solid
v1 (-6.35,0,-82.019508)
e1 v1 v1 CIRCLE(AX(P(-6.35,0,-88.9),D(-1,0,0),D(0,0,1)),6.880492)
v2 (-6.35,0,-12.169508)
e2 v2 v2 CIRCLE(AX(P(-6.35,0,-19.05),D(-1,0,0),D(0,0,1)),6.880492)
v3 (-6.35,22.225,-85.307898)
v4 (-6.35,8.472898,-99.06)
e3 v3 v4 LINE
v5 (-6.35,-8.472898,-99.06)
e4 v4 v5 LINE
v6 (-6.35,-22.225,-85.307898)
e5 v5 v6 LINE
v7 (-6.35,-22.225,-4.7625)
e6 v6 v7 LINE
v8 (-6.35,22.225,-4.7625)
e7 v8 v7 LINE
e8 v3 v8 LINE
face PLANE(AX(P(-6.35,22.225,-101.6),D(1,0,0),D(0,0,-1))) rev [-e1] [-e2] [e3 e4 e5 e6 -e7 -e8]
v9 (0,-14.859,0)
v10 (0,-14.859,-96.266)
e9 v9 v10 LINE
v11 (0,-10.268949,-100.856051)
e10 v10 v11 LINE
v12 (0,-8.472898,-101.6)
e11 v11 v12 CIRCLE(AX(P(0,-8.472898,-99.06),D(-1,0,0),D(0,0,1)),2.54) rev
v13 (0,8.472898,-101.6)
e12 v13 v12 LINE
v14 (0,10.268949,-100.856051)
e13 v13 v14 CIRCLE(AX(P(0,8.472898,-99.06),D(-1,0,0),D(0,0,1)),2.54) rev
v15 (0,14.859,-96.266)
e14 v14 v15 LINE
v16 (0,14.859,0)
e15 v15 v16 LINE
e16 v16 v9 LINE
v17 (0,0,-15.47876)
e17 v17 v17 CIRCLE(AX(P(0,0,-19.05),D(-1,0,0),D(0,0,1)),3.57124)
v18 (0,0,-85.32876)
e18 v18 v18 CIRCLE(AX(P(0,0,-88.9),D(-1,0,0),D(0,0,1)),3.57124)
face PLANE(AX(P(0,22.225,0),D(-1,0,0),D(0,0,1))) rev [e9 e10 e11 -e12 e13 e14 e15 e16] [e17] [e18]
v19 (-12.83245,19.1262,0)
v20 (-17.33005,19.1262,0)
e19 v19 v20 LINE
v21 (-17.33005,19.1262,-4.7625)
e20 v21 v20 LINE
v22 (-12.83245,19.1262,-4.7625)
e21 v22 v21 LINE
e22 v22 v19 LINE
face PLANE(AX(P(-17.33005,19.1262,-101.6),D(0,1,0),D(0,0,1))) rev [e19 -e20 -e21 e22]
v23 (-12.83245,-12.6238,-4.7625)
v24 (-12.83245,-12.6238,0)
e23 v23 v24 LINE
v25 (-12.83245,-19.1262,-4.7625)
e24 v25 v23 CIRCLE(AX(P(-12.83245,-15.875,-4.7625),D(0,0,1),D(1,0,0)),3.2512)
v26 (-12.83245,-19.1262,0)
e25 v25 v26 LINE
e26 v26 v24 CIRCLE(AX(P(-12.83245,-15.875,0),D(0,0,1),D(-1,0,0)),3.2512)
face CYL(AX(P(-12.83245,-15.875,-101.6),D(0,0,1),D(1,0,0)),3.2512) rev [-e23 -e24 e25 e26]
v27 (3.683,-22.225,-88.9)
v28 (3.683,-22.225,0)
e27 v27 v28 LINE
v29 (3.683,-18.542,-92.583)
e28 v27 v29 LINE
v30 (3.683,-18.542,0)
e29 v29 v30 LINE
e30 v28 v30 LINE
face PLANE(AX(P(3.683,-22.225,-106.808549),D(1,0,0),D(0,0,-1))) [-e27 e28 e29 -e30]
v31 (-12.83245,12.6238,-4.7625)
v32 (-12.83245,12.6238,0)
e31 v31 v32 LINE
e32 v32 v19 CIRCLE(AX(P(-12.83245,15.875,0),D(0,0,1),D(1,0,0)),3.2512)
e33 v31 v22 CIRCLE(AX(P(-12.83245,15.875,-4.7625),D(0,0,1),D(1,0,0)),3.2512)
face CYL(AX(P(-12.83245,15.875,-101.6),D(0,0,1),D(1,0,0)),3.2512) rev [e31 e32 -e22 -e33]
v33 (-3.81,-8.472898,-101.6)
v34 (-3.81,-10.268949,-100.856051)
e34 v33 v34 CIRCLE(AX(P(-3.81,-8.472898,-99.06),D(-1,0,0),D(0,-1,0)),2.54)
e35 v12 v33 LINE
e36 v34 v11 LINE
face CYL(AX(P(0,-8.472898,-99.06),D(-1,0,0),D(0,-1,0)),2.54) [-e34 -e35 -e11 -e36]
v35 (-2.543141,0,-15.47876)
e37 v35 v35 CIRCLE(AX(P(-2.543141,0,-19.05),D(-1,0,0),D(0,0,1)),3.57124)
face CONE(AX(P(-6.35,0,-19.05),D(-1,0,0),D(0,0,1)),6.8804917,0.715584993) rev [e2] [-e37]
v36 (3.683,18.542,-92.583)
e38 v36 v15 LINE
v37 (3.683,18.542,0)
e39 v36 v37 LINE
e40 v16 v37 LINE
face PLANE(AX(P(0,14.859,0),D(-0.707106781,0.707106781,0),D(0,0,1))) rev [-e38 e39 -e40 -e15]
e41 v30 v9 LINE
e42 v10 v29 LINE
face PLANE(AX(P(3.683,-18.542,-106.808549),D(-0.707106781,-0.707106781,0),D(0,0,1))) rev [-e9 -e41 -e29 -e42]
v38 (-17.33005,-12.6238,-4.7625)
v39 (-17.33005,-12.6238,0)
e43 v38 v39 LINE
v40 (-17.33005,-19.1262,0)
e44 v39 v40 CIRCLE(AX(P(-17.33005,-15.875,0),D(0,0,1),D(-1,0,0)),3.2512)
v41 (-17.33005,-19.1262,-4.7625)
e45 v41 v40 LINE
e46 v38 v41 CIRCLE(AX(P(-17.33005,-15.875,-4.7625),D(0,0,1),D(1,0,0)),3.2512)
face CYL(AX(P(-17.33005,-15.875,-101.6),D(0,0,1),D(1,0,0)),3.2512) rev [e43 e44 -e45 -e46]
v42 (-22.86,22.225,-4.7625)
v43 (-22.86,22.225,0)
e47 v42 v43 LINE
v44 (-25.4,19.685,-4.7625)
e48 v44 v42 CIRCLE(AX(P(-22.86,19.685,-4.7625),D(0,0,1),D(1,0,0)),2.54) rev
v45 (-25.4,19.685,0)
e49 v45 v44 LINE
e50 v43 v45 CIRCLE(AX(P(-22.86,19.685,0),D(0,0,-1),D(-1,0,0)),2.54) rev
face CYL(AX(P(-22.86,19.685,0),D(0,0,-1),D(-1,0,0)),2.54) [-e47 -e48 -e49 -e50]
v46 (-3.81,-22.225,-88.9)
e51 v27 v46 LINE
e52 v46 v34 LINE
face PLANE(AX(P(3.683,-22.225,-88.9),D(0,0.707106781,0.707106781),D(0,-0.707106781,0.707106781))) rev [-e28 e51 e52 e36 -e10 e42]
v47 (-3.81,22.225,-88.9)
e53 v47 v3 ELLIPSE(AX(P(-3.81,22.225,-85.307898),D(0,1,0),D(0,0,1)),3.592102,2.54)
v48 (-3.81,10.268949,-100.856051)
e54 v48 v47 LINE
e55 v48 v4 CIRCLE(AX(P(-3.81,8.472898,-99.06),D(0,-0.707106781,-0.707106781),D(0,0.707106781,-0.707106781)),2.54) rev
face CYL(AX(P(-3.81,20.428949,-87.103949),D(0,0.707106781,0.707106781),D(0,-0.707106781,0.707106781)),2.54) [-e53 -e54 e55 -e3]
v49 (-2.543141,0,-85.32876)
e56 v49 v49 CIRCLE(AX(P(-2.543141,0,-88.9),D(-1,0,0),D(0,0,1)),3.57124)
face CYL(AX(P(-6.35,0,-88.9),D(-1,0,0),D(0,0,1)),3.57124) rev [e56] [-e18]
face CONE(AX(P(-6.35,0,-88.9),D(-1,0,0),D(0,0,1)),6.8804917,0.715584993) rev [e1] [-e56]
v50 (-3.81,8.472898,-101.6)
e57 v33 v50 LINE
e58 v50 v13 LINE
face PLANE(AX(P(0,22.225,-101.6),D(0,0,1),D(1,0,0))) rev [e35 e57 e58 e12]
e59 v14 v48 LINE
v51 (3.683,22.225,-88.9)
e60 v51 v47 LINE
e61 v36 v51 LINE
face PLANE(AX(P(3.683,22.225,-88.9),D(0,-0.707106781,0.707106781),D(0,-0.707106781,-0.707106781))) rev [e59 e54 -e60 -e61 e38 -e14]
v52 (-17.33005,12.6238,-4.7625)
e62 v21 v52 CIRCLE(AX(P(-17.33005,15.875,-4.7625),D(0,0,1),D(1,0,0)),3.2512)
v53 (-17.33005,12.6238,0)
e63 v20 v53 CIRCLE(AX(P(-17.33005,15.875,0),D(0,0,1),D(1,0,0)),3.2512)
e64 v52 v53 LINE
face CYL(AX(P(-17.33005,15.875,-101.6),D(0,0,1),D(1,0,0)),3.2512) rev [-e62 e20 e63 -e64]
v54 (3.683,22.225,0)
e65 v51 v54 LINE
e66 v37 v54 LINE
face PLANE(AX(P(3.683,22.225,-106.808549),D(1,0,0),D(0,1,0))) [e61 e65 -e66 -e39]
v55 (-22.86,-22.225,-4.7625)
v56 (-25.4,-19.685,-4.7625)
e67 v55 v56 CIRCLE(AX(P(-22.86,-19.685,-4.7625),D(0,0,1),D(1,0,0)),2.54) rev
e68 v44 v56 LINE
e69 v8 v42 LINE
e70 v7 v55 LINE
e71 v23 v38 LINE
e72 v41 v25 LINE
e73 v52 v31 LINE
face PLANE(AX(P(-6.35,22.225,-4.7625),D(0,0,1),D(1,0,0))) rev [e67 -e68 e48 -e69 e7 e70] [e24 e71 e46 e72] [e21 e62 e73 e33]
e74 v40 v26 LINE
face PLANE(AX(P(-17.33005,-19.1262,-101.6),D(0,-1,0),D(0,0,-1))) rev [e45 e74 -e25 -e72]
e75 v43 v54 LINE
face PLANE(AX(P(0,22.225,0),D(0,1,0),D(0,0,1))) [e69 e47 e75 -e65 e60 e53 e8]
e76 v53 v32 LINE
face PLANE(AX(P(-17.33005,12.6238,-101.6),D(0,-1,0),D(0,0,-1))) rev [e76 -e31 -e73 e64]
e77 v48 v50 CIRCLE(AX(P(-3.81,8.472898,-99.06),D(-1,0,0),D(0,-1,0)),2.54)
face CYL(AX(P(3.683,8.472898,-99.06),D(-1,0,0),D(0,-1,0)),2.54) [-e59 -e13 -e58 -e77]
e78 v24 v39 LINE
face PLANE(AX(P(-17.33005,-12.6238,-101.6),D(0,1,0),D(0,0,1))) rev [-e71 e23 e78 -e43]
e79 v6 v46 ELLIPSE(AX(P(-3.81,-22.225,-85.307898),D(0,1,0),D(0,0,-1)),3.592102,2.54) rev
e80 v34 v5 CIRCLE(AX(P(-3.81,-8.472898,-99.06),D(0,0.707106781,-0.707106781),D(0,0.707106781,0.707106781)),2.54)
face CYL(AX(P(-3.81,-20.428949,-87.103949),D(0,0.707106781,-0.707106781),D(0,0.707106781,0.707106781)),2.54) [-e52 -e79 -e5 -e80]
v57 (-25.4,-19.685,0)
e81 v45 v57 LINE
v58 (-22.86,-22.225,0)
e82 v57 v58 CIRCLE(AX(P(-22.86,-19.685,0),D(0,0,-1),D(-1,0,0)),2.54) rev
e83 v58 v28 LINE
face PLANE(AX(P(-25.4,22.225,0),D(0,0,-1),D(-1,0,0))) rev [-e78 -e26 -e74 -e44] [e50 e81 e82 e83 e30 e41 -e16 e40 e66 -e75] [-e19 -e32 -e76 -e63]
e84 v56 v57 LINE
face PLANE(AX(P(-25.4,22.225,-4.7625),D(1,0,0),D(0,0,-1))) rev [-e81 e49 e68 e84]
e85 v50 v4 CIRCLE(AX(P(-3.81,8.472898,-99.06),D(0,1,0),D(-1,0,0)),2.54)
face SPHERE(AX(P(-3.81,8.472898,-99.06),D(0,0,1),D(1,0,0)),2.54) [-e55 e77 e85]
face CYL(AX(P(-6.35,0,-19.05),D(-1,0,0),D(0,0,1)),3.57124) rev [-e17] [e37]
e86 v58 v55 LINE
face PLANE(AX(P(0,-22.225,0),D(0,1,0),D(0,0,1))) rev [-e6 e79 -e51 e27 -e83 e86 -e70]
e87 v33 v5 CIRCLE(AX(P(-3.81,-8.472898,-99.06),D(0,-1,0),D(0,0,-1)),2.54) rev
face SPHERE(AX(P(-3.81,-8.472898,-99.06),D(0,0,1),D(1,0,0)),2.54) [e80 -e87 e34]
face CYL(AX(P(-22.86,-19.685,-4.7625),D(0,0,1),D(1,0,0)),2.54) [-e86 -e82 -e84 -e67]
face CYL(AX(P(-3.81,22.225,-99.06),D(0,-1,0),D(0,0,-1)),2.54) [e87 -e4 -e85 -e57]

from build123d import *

# Parameters (mm, degrees)
BOSS_EXTRUDE1_DEPTH                              = 22.225
SKETCH2_W                                        = 3.683
SKETCH2_H                                        = 3.683
BOSS_EXTRUDE2_DEPTH                              = 101.6
CUT_EXTRUDE1_DEPTH                               = 108.059192156
FILLET1_R                                        = 2.54
CSK_FOR_1_4_FLAT_HEAD_MACHINE_SCREW1_D           = 7.14248
CSK_FOR_1_4_FLAT_HEAD_MACHINE_SCREW1_CSINK_D     = 13.7609834
CSK_FOR_1_4_FLAT_HEAD_MACHINE_SCREW1_CSINK_ANGLE = 82
CUT_EXTRUDE2_DEPTH                               = 106.732743864
FILLET2_R                                        = 2.54
CHAMFER1_SIZE                                    = 3.683


with BuildPart() as part:
    # Sketch1 → Boss-Extrude1 (new, symmetric)
    with BuildSketch(Plane(origin=(0, 0, 0), x_dir=(1, 0, 0), z_dir=(0, 1, 0))):
        Polygon((0, 0), (0, 101.6), (-6.35, 101.6), (-6.35, 4.7625), (-25.4, 4.7625), (-25.4, 0), align=None)
    extrude(amount=BOSS_EXTRUDE1_DEPTH, both=True)

    # Sketch2 → Boss-Extrude2 (add)
    with BuildSketch(Plane.XY):
        with Locations((1.8415, 20.3835)):
            Rectangle(SKETCH2_W, SKETCH2_H)
        with Locations((1.8415, -20.3835)):
            Rectangle(SKETCH2_W, SKETCH2_H)
    extrude(amount=-BOSS_EXTRUDE2_DEPTH)

    # Sketch3 → Cut-Extrude1 (cut, through all)
    with BuildSketch(Plane.XY):
        with BuildLine():
            Line((-17.33005, 19.1262), (-12.83245, 19.1262))
            ThreePointArc((-12.83245, 19.1262), (-9.58125, 15.875), (-12.83245, 12.6238))
            Line((-12.83245, 12.6238), (-17.33005, 12.6238))
            ThreePointArc((-17.33005, 12.6238), (-20.58125, 15.875), (-17.33005, 19.1262))
        make_face()
        with BuildLine():
            Line((-17.33005, -19.1262), (-12.83245, -19.1262))
            ThreePointArc((-12.83245, -19.1262), (-9.58125, -15.875), (-12.83245, -12.6238))
            Line((-12.83245, -12.6238), (-17.33005, -12.6238))
            ThreePointArc((-17.33005, -12.6238), (-20.58125, -15.875), (-17.33005, -19.1262))
        make_face()
    extrude(amount=-CUT_EXTRUDE1_DEPTH, mode=Mode.SUBTRACT)

    # Fillet1
    fillet1_edges = [part.edges().sort_by_distance(p)[0] for p in [
        (-25.4, 22.225, -2.38125),
        (-25.4, -22.225, -2.38125),
    ]]
    fillet(fillet1_edges, radius=FILLET1_R)

    # CSK for 1/4 Flat Head Machine Screw1 (through all)
    with Locations(Plane.ZY.offset(6.35)):
        with Locations((-19.05, 0), (-88.9, 0)):
            CounterSinkHole(CSK_FOR_1_4_FLAT_HEAD_MACHINE_SCREW1_D / 2, CSK_FOR_1_4_FLAT_HEAD_MACHINE_SCREW1_CSINK_D / 2, counter_sink_angle=CSK_FOR_1_4_FLAT_HEAD_MACHINE_SCREW1_CSINK_ANGLE)

    # Sketch6 → Cut-Extrude2 (cut, through all)
    with BuildSketch(Plane.ZY.offset(6.35)):
        Polygon((-101.6, 22.225), (-88.9, 22.225), (-101.6, 9.525), align=None)
        Polygon((-88.9, -22.225), (-101.6, -9.525), (-101.6, -22.225), align=None)
    extrude(amount=-CUT_EXTRUDE2_DEPTH, mode=Mode.SUBTRACT)

    # Fillet2
    fillet2_edges = [part.edges().sort_by_distance(p)[0] for p in [
        (-6.35, 0, -101.6),
        (-3.175, 9.525, -101.6),
        (-6.35, 15.875, -95.25),
        (-3.175, -9.525, -101.6),
        (-6.35, -15.875, -95.25),
    ]]
    fillet(fillet2_edges, radius=FILLET2_R)

    # Chamfer1
    chamfer1_edges = [part.edges().sort_by_distance(p)[0] for p in [
        (0, -18.542, -46.2915),
        (0, 18.542, -46.2915),
    ]]
    chamfer(chamfer1_edges, length=CHAMFER1_SIZE - 0.0001)  # a hair under: the kernel refuses the full size


solid = part.part
